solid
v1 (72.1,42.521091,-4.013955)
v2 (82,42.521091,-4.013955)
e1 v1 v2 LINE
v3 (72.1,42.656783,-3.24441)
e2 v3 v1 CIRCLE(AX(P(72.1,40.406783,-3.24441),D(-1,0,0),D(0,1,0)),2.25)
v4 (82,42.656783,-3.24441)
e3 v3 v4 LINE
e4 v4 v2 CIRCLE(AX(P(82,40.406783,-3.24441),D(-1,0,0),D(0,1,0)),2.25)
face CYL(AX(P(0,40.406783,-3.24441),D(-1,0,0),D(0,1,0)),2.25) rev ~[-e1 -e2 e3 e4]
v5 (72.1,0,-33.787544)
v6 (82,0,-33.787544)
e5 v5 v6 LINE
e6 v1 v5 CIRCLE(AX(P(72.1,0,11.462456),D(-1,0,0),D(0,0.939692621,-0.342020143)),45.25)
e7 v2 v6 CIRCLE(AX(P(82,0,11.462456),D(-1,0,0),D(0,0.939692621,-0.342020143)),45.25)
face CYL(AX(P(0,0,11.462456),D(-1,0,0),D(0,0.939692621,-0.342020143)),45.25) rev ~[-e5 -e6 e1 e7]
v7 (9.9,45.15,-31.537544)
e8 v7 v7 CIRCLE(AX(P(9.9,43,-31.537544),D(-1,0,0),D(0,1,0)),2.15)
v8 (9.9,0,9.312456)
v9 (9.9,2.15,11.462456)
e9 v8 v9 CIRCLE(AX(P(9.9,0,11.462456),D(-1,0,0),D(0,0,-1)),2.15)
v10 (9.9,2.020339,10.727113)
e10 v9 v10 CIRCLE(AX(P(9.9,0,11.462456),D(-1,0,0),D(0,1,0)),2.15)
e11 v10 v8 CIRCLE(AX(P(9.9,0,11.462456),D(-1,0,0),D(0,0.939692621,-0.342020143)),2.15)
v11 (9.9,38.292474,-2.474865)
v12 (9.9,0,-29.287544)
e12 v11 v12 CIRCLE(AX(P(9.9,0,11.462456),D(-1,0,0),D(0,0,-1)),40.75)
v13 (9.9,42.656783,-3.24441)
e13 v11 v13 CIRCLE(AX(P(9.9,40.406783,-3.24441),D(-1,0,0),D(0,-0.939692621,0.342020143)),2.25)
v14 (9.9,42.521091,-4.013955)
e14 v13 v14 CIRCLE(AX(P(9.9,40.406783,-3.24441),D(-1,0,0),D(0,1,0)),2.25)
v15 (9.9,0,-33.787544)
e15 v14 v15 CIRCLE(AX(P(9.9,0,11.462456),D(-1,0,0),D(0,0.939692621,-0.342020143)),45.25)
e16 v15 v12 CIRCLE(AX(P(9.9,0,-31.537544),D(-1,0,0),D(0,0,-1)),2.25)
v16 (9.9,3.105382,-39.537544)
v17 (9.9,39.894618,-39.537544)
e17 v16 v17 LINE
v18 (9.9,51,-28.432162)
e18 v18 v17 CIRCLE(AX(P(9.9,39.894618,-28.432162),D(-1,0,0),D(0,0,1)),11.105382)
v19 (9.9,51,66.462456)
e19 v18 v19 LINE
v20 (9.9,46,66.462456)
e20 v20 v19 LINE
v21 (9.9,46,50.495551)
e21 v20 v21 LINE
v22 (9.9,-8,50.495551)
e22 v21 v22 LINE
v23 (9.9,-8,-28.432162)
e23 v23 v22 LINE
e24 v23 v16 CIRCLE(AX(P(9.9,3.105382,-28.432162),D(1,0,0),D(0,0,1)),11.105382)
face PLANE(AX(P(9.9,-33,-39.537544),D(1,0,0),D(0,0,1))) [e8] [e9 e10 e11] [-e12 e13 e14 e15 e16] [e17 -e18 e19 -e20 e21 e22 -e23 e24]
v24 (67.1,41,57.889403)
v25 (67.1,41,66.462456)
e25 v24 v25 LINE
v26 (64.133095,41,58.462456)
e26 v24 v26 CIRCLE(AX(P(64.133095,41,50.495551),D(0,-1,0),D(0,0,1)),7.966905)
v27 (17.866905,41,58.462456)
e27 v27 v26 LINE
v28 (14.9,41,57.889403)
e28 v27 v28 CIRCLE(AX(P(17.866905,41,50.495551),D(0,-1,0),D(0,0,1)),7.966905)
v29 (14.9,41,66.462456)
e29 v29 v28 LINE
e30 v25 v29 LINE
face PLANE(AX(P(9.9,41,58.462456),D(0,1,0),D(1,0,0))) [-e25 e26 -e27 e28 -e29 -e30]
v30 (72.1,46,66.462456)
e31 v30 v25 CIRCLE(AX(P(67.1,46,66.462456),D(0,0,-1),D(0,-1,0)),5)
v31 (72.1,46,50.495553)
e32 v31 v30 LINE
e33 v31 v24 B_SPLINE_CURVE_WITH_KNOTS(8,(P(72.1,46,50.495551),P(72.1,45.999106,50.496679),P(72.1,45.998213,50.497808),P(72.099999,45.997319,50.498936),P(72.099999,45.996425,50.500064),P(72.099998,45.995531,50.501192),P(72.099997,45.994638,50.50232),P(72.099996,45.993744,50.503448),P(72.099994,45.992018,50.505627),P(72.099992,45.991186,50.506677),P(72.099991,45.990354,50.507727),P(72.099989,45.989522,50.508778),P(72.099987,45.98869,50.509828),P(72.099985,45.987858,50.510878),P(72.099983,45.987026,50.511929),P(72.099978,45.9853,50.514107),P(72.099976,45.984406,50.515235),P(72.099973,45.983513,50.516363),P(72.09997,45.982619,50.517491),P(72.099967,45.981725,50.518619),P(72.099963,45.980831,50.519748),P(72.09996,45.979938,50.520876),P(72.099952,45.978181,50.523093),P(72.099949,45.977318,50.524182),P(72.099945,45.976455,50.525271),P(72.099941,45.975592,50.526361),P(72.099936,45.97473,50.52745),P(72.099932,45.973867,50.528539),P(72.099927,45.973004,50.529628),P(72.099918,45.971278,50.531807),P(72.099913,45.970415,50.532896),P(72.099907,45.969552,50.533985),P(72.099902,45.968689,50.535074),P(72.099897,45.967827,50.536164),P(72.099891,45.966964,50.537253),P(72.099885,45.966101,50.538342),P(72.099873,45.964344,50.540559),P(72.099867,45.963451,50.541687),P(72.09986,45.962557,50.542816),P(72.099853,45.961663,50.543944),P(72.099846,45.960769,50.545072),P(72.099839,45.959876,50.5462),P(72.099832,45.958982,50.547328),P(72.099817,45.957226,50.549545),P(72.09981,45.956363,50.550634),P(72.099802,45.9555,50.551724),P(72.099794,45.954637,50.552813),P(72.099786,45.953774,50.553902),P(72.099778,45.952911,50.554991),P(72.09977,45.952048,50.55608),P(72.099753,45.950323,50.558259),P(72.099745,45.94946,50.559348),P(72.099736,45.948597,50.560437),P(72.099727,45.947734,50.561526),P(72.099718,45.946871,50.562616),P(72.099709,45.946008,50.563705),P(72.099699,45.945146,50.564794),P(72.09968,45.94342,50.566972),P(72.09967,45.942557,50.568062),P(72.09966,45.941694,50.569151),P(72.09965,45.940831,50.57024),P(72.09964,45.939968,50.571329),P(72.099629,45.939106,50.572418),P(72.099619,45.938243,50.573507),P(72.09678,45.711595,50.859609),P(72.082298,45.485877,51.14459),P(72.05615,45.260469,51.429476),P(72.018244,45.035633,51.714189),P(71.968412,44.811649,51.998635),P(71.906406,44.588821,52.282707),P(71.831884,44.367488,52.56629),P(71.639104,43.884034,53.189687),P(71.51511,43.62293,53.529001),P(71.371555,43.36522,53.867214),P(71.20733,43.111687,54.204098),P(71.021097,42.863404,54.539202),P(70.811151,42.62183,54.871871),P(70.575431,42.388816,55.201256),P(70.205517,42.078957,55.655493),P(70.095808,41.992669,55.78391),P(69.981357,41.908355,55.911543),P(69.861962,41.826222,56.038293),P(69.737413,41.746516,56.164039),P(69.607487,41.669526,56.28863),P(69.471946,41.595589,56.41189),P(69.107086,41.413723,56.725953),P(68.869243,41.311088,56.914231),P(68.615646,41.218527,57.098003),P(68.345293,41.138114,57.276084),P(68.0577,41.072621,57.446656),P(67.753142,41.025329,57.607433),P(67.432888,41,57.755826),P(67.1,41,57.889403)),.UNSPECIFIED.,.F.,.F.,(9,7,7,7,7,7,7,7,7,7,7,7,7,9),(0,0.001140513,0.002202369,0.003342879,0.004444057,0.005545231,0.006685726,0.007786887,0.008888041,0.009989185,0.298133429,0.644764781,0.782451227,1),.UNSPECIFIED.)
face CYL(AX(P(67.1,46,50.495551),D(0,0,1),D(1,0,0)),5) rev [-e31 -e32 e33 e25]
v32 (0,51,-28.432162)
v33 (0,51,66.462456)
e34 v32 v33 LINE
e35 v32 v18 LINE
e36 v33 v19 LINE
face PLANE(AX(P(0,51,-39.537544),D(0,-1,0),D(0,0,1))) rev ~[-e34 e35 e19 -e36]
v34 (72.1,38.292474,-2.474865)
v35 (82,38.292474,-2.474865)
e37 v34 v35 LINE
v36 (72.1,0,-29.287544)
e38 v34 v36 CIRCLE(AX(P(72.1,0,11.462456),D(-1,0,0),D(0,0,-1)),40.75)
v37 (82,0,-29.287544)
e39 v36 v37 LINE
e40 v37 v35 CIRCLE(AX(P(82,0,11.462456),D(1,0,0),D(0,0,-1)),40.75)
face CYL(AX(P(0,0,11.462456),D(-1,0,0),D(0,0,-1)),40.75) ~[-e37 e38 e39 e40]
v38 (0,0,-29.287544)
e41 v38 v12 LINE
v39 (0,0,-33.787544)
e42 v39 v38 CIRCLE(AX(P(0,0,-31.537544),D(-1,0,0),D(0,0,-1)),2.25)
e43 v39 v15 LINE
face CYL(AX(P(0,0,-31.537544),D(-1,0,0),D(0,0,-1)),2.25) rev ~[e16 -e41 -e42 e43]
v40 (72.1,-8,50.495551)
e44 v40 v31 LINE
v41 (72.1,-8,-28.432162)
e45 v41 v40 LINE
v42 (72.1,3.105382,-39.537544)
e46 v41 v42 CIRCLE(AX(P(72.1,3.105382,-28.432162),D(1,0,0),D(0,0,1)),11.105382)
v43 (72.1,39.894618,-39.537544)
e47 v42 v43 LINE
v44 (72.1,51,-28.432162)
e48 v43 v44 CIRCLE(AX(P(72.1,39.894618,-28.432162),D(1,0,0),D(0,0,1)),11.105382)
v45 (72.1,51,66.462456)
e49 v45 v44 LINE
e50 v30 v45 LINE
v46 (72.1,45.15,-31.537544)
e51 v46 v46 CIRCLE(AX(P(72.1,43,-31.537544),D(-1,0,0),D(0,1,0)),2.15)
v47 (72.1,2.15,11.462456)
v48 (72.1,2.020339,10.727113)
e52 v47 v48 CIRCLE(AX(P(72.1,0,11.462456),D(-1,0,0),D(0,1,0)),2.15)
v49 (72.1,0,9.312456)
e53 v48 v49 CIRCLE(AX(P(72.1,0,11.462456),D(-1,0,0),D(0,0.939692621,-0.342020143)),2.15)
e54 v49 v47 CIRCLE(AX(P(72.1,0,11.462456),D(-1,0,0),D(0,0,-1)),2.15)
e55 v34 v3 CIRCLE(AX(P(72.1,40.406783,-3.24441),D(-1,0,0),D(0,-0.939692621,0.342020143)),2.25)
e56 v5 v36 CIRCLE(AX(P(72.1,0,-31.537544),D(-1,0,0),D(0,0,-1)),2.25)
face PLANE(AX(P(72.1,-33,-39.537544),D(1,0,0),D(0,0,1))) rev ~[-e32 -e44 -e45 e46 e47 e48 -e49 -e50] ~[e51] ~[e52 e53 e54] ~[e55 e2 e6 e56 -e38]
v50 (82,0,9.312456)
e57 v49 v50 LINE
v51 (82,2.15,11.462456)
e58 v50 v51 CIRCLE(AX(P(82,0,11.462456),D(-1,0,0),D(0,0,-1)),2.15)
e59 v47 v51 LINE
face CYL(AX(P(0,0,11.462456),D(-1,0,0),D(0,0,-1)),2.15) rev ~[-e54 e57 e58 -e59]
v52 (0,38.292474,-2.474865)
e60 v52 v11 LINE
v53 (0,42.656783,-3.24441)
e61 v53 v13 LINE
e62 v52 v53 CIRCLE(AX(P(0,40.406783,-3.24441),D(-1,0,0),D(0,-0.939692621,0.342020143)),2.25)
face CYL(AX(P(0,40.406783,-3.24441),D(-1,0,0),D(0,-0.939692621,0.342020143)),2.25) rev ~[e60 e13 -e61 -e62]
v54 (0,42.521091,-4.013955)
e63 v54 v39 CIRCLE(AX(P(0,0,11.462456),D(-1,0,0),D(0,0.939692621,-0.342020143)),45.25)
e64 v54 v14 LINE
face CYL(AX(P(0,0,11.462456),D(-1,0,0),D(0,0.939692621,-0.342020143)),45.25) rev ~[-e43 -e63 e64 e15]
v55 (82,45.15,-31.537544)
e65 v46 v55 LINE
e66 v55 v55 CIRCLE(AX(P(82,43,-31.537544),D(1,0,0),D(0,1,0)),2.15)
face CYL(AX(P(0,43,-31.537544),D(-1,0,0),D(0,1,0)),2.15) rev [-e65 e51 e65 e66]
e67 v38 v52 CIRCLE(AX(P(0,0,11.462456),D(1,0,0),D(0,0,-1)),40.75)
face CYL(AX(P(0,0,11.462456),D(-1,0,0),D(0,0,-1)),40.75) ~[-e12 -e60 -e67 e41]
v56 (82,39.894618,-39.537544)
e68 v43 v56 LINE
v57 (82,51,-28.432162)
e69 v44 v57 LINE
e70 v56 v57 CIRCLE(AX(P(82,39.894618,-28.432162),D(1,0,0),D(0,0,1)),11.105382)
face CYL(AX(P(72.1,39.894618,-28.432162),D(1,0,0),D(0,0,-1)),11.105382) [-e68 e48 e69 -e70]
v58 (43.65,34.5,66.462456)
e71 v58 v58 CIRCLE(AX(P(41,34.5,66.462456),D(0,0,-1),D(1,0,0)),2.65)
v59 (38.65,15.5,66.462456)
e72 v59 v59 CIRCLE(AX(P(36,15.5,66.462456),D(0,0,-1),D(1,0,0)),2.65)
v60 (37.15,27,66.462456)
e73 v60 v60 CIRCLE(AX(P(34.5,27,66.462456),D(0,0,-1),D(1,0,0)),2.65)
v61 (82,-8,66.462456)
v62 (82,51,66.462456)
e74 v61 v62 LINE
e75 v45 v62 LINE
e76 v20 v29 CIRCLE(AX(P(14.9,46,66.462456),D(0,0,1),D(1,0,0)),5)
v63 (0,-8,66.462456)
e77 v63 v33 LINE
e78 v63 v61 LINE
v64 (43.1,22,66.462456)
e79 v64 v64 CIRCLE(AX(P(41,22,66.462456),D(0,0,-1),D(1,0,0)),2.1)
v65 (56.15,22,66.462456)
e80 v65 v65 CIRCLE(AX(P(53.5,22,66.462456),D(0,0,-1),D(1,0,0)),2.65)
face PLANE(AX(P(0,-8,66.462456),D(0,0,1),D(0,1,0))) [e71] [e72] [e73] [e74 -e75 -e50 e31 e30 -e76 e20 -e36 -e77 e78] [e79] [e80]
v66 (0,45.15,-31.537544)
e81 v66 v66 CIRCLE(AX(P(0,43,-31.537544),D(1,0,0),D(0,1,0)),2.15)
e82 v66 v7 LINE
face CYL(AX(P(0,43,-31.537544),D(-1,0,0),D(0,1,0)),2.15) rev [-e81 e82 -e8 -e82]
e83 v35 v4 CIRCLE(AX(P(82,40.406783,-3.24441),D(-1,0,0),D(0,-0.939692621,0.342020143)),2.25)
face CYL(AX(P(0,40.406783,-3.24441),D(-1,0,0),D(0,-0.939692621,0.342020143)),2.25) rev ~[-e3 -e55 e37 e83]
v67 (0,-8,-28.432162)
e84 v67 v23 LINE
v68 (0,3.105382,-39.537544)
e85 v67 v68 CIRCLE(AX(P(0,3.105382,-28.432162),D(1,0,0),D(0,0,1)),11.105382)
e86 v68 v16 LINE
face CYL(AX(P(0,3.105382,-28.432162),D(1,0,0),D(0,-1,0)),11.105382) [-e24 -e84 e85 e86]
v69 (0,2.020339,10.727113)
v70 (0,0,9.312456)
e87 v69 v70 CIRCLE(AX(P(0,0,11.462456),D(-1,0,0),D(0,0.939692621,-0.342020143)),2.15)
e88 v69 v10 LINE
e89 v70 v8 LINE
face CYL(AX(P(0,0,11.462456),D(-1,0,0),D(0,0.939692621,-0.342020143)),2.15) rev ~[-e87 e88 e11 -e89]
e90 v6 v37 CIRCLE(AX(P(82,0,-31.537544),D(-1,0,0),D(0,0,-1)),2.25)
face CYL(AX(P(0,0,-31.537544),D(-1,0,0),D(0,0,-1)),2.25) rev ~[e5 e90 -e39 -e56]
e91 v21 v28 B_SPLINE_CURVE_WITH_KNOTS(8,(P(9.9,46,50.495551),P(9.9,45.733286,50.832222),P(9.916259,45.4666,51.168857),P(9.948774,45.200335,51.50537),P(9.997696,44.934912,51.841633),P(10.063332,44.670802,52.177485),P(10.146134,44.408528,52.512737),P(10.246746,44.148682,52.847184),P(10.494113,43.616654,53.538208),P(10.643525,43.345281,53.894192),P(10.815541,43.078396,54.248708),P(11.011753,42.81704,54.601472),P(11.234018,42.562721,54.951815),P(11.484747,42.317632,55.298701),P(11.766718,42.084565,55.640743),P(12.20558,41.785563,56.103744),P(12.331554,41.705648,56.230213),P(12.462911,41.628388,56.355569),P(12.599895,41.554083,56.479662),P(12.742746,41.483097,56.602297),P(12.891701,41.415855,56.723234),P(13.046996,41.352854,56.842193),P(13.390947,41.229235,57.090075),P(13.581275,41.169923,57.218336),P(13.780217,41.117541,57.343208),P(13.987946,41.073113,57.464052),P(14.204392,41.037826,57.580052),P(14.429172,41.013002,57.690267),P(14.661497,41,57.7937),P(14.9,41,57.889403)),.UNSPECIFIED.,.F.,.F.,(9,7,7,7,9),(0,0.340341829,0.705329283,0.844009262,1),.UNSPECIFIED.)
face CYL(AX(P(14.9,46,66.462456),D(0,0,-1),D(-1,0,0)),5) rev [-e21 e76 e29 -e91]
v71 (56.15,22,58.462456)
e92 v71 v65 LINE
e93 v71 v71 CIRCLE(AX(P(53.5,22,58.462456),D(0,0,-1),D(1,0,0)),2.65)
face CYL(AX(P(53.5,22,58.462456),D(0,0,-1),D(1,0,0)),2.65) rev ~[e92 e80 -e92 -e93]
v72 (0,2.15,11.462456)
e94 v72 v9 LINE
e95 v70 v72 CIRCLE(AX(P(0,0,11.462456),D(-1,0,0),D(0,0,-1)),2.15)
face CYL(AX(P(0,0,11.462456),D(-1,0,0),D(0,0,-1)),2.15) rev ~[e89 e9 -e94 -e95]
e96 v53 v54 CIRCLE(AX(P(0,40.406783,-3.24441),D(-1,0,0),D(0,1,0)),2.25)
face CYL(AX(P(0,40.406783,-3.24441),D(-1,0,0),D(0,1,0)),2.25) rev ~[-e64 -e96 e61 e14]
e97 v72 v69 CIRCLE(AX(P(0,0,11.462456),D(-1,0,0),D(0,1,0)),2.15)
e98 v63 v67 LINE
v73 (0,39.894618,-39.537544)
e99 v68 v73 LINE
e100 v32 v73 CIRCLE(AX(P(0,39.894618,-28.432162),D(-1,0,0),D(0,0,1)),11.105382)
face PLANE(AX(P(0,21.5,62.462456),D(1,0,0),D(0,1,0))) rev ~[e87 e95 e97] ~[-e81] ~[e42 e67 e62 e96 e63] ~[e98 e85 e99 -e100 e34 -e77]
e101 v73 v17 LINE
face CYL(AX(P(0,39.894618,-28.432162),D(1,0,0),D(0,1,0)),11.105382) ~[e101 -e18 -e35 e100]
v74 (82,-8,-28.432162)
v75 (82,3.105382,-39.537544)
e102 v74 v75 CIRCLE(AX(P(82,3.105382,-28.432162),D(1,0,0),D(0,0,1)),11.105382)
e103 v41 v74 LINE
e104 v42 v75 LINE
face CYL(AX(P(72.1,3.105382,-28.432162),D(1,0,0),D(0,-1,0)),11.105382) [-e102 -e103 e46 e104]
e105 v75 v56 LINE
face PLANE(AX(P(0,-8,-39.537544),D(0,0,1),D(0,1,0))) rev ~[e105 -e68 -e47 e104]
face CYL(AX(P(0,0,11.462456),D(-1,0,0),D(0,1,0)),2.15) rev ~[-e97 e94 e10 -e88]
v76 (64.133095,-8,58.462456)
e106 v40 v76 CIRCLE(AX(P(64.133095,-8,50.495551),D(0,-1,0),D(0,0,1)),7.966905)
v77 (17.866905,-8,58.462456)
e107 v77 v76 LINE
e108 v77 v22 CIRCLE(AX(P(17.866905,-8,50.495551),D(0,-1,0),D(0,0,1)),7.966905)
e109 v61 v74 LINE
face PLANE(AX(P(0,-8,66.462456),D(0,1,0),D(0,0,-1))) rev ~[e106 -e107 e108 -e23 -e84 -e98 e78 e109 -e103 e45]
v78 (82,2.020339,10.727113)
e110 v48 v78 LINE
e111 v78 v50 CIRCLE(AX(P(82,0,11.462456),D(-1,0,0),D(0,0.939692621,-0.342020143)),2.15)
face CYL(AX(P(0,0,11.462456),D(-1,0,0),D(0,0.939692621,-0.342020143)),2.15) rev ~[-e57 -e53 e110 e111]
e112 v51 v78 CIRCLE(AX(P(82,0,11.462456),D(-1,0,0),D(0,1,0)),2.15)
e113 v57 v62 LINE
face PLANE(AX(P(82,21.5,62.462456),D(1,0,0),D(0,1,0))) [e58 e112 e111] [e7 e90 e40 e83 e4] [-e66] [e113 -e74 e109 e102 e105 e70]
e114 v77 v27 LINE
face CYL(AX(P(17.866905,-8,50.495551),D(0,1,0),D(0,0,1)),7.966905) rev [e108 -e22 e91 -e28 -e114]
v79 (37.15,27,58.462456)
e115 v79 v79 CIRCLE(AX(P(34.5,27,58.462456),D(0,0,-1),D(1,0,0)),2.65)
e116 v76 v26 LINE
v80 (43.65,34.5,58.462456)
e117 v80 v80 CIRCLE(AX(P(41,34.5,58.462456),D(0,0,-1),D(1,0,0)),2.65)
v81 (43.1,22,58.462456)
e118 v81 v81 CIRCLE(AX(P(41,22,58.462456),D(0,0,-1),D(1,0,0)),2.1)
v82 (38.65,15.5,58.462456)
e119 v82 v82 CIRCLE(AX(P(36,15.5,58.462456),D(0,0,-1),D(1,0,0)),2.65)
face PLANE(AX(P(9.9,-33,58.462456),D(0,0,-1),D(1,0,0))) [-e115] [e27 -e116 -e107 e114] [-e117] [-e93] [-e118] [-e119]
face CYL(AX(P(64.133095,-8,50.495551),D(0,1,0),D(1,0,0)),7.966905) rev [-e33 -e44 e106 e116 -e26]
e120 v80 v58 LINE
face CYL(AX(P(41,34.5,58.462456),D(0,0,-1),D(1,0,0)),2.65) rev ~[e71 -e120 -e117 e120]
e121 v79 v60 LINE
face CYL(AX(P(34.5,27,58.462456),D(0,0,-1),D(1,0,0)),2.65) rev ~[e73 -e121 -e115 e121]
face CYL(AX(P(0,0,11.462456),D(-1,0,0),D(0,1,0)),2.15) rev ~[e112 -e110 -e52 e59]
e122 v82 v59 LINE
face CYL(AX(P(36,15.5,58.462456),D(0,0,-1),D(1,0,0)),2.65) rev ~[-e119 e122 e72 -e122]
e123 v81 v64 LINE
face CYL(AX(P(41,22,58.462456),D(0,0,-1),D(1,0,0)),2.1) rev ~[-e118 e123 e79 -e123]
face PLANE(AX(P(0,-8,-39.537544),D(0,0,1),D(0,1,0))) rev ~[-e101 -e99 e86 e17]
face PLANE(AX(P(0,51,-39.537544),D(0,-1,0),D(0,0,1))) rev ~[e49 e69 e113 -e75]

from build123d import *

# Parameters (mm, degrees)
F0_W     = 59
F0_H     = 8
F0_H_2   = 98
F0_R     = 2.15
F1_DEPTH = 82
F2_W     = 62.2
F2_H     = 98
F3_DEPTH = 25
F4_DEPTH = 125.3
F5_R     = 2.1
F5_R_2   = 2.65
F5_W     = 62.2
F5_H     = 10
F6_DEPTH = 20.8
F7_R     = 7.9669047558
F8_R     = 11.1053823869
F9_R     = 5


with BuildPart() as f1:
    # F0 (on Right) → F1 (new body)
    with BuildSketch(Plane.YZ):
        with Locations((21.5, 62.4624560177)):
            Rectangle(F0_W, F0_H)
        with Locations((21.5, 9.4624560177)):
            Rectangle(F0_W, F0_H_2)
        with BuildLine():
            ThreePointArc((0, -33.7875439823), (-2.25, -31.5375439823), (0, -29.2875439823))
            Line((0, -29.2875439823), (0, 9.3124560177))
            ThreePointArc((0, 9.3124560177), (-1.5202795796, 12.9827355973), (2.15, 11.4624560177))
            ThreePointArc((2.15, 11.4624560177), (2.117336669, 11.0891124357), (2.0203391347, 10.7271127096))
            Line((2.0203391347, 10.7271127096), (38.292474297, -2.4748648228))
            ThreePointArc((38.292474297, -2.4748648228), (40.7974910935, -1.028592701), (42.6567826938, -3.2444101453))
            ThreePointArc((42.6567826938, -3.2444101453), (42.6226001381, -3.635118545), (42.5210910906, -4.0139554678))
            ThreePointArc((42.5210910906, -4.0139554678), (25.9543337449, -25.6041739863), (0, -33.7875439823))
        make_face(mode=Mode.SUBTRACT)
        with Locations((43, -31.5375439823)):
            Circle(F0_R, mode=Mode.SUBTRACT)
        with BuildLine():
            Line((0, 9.3124560177), (0, -29.2875439823))
            ThreePointArc((0, -29.2875439823), (23.3732397813, -21.917989787), (38.292474297, -2.4748648228))
            Line((38.292474297, -2.4748648228), (2.0203391347, 10.7271127096))
            ThreePointArc((2.0203391347, 10.7271127096), (1.2331893382, 9.7012791225), (0, 9.3124560177))
        make_face()
    extrude(amount=F1_DEPTH)

    # F2 (on face) → F3 (join)
    with BuildSketch(Plane.XZ.offset(8)):
        with Locations((41, 9.4624560177)):
            Rectangle(F2_W, F2_H)
    extrude(amount=F3_DEPTH)

    # F4 (cut): a face of the model
    f4_faces = [f1.faces().sort_by_distance(p)[0] for p in [
        (41, -33, 9.4624560177),
    ]]
    extrude(f4_faces, amount=-F4_DEPTH, mode=Mode.SUBTRACT)

    # F5 (on face) → F6 (cut)
    with BuildSketch(Plane(origin=(0, 0, 58.4624560177), x_dir=(1, 0, 0), z_dir=(0, 0, -1))):
        with Locations((41, -22)):
            Circle(F5_R)
        with Locations((53.5, -22)):
            Circle(F5_R_2)
        with Locations((34.5, -27)):
            Circle(F5_R_2)
        with Locations((36, -15.5)):
            Circle(F5_R_2)
        with Locations((41, -34.5)):
            Circle(F5_R_2)
        with Locations((41, -46)):
            Rectangle(F5_W, F5_H)
    extrude(amount=-F6_DEPTH, mode=Mode.SUBTRACT)

    # F7
    f7_edges = [f1.edges().sort_by_distance(p)[0] for p in [
        (9.9, 16.5, 58.462456),
        (72.1, 16.5, 58.462456),
    ]]
    fillet(f7_edges, radius=F7_R)

    # F8
    f8_edges = [f1.edges().sort_by_distance(p)[0] for p in [
        (4.95, -8, -39.537544),
        (4.95, 51, -39.537544),
        (77.05, 51, -39.537544),
        (77.05, -8, -39.537544),
    ]]
    fillet(f8_edges, radius=F8_R)

    # F9
    f9_edges = [f1.edges().sort_by_distance(p)[0] for p in [
        (9.9, 41, 62.462456),
        (72.1, 41, 62.462456),
    ]]
    fillet(f9_edges, radius=F9_R)


solid = f1.part
